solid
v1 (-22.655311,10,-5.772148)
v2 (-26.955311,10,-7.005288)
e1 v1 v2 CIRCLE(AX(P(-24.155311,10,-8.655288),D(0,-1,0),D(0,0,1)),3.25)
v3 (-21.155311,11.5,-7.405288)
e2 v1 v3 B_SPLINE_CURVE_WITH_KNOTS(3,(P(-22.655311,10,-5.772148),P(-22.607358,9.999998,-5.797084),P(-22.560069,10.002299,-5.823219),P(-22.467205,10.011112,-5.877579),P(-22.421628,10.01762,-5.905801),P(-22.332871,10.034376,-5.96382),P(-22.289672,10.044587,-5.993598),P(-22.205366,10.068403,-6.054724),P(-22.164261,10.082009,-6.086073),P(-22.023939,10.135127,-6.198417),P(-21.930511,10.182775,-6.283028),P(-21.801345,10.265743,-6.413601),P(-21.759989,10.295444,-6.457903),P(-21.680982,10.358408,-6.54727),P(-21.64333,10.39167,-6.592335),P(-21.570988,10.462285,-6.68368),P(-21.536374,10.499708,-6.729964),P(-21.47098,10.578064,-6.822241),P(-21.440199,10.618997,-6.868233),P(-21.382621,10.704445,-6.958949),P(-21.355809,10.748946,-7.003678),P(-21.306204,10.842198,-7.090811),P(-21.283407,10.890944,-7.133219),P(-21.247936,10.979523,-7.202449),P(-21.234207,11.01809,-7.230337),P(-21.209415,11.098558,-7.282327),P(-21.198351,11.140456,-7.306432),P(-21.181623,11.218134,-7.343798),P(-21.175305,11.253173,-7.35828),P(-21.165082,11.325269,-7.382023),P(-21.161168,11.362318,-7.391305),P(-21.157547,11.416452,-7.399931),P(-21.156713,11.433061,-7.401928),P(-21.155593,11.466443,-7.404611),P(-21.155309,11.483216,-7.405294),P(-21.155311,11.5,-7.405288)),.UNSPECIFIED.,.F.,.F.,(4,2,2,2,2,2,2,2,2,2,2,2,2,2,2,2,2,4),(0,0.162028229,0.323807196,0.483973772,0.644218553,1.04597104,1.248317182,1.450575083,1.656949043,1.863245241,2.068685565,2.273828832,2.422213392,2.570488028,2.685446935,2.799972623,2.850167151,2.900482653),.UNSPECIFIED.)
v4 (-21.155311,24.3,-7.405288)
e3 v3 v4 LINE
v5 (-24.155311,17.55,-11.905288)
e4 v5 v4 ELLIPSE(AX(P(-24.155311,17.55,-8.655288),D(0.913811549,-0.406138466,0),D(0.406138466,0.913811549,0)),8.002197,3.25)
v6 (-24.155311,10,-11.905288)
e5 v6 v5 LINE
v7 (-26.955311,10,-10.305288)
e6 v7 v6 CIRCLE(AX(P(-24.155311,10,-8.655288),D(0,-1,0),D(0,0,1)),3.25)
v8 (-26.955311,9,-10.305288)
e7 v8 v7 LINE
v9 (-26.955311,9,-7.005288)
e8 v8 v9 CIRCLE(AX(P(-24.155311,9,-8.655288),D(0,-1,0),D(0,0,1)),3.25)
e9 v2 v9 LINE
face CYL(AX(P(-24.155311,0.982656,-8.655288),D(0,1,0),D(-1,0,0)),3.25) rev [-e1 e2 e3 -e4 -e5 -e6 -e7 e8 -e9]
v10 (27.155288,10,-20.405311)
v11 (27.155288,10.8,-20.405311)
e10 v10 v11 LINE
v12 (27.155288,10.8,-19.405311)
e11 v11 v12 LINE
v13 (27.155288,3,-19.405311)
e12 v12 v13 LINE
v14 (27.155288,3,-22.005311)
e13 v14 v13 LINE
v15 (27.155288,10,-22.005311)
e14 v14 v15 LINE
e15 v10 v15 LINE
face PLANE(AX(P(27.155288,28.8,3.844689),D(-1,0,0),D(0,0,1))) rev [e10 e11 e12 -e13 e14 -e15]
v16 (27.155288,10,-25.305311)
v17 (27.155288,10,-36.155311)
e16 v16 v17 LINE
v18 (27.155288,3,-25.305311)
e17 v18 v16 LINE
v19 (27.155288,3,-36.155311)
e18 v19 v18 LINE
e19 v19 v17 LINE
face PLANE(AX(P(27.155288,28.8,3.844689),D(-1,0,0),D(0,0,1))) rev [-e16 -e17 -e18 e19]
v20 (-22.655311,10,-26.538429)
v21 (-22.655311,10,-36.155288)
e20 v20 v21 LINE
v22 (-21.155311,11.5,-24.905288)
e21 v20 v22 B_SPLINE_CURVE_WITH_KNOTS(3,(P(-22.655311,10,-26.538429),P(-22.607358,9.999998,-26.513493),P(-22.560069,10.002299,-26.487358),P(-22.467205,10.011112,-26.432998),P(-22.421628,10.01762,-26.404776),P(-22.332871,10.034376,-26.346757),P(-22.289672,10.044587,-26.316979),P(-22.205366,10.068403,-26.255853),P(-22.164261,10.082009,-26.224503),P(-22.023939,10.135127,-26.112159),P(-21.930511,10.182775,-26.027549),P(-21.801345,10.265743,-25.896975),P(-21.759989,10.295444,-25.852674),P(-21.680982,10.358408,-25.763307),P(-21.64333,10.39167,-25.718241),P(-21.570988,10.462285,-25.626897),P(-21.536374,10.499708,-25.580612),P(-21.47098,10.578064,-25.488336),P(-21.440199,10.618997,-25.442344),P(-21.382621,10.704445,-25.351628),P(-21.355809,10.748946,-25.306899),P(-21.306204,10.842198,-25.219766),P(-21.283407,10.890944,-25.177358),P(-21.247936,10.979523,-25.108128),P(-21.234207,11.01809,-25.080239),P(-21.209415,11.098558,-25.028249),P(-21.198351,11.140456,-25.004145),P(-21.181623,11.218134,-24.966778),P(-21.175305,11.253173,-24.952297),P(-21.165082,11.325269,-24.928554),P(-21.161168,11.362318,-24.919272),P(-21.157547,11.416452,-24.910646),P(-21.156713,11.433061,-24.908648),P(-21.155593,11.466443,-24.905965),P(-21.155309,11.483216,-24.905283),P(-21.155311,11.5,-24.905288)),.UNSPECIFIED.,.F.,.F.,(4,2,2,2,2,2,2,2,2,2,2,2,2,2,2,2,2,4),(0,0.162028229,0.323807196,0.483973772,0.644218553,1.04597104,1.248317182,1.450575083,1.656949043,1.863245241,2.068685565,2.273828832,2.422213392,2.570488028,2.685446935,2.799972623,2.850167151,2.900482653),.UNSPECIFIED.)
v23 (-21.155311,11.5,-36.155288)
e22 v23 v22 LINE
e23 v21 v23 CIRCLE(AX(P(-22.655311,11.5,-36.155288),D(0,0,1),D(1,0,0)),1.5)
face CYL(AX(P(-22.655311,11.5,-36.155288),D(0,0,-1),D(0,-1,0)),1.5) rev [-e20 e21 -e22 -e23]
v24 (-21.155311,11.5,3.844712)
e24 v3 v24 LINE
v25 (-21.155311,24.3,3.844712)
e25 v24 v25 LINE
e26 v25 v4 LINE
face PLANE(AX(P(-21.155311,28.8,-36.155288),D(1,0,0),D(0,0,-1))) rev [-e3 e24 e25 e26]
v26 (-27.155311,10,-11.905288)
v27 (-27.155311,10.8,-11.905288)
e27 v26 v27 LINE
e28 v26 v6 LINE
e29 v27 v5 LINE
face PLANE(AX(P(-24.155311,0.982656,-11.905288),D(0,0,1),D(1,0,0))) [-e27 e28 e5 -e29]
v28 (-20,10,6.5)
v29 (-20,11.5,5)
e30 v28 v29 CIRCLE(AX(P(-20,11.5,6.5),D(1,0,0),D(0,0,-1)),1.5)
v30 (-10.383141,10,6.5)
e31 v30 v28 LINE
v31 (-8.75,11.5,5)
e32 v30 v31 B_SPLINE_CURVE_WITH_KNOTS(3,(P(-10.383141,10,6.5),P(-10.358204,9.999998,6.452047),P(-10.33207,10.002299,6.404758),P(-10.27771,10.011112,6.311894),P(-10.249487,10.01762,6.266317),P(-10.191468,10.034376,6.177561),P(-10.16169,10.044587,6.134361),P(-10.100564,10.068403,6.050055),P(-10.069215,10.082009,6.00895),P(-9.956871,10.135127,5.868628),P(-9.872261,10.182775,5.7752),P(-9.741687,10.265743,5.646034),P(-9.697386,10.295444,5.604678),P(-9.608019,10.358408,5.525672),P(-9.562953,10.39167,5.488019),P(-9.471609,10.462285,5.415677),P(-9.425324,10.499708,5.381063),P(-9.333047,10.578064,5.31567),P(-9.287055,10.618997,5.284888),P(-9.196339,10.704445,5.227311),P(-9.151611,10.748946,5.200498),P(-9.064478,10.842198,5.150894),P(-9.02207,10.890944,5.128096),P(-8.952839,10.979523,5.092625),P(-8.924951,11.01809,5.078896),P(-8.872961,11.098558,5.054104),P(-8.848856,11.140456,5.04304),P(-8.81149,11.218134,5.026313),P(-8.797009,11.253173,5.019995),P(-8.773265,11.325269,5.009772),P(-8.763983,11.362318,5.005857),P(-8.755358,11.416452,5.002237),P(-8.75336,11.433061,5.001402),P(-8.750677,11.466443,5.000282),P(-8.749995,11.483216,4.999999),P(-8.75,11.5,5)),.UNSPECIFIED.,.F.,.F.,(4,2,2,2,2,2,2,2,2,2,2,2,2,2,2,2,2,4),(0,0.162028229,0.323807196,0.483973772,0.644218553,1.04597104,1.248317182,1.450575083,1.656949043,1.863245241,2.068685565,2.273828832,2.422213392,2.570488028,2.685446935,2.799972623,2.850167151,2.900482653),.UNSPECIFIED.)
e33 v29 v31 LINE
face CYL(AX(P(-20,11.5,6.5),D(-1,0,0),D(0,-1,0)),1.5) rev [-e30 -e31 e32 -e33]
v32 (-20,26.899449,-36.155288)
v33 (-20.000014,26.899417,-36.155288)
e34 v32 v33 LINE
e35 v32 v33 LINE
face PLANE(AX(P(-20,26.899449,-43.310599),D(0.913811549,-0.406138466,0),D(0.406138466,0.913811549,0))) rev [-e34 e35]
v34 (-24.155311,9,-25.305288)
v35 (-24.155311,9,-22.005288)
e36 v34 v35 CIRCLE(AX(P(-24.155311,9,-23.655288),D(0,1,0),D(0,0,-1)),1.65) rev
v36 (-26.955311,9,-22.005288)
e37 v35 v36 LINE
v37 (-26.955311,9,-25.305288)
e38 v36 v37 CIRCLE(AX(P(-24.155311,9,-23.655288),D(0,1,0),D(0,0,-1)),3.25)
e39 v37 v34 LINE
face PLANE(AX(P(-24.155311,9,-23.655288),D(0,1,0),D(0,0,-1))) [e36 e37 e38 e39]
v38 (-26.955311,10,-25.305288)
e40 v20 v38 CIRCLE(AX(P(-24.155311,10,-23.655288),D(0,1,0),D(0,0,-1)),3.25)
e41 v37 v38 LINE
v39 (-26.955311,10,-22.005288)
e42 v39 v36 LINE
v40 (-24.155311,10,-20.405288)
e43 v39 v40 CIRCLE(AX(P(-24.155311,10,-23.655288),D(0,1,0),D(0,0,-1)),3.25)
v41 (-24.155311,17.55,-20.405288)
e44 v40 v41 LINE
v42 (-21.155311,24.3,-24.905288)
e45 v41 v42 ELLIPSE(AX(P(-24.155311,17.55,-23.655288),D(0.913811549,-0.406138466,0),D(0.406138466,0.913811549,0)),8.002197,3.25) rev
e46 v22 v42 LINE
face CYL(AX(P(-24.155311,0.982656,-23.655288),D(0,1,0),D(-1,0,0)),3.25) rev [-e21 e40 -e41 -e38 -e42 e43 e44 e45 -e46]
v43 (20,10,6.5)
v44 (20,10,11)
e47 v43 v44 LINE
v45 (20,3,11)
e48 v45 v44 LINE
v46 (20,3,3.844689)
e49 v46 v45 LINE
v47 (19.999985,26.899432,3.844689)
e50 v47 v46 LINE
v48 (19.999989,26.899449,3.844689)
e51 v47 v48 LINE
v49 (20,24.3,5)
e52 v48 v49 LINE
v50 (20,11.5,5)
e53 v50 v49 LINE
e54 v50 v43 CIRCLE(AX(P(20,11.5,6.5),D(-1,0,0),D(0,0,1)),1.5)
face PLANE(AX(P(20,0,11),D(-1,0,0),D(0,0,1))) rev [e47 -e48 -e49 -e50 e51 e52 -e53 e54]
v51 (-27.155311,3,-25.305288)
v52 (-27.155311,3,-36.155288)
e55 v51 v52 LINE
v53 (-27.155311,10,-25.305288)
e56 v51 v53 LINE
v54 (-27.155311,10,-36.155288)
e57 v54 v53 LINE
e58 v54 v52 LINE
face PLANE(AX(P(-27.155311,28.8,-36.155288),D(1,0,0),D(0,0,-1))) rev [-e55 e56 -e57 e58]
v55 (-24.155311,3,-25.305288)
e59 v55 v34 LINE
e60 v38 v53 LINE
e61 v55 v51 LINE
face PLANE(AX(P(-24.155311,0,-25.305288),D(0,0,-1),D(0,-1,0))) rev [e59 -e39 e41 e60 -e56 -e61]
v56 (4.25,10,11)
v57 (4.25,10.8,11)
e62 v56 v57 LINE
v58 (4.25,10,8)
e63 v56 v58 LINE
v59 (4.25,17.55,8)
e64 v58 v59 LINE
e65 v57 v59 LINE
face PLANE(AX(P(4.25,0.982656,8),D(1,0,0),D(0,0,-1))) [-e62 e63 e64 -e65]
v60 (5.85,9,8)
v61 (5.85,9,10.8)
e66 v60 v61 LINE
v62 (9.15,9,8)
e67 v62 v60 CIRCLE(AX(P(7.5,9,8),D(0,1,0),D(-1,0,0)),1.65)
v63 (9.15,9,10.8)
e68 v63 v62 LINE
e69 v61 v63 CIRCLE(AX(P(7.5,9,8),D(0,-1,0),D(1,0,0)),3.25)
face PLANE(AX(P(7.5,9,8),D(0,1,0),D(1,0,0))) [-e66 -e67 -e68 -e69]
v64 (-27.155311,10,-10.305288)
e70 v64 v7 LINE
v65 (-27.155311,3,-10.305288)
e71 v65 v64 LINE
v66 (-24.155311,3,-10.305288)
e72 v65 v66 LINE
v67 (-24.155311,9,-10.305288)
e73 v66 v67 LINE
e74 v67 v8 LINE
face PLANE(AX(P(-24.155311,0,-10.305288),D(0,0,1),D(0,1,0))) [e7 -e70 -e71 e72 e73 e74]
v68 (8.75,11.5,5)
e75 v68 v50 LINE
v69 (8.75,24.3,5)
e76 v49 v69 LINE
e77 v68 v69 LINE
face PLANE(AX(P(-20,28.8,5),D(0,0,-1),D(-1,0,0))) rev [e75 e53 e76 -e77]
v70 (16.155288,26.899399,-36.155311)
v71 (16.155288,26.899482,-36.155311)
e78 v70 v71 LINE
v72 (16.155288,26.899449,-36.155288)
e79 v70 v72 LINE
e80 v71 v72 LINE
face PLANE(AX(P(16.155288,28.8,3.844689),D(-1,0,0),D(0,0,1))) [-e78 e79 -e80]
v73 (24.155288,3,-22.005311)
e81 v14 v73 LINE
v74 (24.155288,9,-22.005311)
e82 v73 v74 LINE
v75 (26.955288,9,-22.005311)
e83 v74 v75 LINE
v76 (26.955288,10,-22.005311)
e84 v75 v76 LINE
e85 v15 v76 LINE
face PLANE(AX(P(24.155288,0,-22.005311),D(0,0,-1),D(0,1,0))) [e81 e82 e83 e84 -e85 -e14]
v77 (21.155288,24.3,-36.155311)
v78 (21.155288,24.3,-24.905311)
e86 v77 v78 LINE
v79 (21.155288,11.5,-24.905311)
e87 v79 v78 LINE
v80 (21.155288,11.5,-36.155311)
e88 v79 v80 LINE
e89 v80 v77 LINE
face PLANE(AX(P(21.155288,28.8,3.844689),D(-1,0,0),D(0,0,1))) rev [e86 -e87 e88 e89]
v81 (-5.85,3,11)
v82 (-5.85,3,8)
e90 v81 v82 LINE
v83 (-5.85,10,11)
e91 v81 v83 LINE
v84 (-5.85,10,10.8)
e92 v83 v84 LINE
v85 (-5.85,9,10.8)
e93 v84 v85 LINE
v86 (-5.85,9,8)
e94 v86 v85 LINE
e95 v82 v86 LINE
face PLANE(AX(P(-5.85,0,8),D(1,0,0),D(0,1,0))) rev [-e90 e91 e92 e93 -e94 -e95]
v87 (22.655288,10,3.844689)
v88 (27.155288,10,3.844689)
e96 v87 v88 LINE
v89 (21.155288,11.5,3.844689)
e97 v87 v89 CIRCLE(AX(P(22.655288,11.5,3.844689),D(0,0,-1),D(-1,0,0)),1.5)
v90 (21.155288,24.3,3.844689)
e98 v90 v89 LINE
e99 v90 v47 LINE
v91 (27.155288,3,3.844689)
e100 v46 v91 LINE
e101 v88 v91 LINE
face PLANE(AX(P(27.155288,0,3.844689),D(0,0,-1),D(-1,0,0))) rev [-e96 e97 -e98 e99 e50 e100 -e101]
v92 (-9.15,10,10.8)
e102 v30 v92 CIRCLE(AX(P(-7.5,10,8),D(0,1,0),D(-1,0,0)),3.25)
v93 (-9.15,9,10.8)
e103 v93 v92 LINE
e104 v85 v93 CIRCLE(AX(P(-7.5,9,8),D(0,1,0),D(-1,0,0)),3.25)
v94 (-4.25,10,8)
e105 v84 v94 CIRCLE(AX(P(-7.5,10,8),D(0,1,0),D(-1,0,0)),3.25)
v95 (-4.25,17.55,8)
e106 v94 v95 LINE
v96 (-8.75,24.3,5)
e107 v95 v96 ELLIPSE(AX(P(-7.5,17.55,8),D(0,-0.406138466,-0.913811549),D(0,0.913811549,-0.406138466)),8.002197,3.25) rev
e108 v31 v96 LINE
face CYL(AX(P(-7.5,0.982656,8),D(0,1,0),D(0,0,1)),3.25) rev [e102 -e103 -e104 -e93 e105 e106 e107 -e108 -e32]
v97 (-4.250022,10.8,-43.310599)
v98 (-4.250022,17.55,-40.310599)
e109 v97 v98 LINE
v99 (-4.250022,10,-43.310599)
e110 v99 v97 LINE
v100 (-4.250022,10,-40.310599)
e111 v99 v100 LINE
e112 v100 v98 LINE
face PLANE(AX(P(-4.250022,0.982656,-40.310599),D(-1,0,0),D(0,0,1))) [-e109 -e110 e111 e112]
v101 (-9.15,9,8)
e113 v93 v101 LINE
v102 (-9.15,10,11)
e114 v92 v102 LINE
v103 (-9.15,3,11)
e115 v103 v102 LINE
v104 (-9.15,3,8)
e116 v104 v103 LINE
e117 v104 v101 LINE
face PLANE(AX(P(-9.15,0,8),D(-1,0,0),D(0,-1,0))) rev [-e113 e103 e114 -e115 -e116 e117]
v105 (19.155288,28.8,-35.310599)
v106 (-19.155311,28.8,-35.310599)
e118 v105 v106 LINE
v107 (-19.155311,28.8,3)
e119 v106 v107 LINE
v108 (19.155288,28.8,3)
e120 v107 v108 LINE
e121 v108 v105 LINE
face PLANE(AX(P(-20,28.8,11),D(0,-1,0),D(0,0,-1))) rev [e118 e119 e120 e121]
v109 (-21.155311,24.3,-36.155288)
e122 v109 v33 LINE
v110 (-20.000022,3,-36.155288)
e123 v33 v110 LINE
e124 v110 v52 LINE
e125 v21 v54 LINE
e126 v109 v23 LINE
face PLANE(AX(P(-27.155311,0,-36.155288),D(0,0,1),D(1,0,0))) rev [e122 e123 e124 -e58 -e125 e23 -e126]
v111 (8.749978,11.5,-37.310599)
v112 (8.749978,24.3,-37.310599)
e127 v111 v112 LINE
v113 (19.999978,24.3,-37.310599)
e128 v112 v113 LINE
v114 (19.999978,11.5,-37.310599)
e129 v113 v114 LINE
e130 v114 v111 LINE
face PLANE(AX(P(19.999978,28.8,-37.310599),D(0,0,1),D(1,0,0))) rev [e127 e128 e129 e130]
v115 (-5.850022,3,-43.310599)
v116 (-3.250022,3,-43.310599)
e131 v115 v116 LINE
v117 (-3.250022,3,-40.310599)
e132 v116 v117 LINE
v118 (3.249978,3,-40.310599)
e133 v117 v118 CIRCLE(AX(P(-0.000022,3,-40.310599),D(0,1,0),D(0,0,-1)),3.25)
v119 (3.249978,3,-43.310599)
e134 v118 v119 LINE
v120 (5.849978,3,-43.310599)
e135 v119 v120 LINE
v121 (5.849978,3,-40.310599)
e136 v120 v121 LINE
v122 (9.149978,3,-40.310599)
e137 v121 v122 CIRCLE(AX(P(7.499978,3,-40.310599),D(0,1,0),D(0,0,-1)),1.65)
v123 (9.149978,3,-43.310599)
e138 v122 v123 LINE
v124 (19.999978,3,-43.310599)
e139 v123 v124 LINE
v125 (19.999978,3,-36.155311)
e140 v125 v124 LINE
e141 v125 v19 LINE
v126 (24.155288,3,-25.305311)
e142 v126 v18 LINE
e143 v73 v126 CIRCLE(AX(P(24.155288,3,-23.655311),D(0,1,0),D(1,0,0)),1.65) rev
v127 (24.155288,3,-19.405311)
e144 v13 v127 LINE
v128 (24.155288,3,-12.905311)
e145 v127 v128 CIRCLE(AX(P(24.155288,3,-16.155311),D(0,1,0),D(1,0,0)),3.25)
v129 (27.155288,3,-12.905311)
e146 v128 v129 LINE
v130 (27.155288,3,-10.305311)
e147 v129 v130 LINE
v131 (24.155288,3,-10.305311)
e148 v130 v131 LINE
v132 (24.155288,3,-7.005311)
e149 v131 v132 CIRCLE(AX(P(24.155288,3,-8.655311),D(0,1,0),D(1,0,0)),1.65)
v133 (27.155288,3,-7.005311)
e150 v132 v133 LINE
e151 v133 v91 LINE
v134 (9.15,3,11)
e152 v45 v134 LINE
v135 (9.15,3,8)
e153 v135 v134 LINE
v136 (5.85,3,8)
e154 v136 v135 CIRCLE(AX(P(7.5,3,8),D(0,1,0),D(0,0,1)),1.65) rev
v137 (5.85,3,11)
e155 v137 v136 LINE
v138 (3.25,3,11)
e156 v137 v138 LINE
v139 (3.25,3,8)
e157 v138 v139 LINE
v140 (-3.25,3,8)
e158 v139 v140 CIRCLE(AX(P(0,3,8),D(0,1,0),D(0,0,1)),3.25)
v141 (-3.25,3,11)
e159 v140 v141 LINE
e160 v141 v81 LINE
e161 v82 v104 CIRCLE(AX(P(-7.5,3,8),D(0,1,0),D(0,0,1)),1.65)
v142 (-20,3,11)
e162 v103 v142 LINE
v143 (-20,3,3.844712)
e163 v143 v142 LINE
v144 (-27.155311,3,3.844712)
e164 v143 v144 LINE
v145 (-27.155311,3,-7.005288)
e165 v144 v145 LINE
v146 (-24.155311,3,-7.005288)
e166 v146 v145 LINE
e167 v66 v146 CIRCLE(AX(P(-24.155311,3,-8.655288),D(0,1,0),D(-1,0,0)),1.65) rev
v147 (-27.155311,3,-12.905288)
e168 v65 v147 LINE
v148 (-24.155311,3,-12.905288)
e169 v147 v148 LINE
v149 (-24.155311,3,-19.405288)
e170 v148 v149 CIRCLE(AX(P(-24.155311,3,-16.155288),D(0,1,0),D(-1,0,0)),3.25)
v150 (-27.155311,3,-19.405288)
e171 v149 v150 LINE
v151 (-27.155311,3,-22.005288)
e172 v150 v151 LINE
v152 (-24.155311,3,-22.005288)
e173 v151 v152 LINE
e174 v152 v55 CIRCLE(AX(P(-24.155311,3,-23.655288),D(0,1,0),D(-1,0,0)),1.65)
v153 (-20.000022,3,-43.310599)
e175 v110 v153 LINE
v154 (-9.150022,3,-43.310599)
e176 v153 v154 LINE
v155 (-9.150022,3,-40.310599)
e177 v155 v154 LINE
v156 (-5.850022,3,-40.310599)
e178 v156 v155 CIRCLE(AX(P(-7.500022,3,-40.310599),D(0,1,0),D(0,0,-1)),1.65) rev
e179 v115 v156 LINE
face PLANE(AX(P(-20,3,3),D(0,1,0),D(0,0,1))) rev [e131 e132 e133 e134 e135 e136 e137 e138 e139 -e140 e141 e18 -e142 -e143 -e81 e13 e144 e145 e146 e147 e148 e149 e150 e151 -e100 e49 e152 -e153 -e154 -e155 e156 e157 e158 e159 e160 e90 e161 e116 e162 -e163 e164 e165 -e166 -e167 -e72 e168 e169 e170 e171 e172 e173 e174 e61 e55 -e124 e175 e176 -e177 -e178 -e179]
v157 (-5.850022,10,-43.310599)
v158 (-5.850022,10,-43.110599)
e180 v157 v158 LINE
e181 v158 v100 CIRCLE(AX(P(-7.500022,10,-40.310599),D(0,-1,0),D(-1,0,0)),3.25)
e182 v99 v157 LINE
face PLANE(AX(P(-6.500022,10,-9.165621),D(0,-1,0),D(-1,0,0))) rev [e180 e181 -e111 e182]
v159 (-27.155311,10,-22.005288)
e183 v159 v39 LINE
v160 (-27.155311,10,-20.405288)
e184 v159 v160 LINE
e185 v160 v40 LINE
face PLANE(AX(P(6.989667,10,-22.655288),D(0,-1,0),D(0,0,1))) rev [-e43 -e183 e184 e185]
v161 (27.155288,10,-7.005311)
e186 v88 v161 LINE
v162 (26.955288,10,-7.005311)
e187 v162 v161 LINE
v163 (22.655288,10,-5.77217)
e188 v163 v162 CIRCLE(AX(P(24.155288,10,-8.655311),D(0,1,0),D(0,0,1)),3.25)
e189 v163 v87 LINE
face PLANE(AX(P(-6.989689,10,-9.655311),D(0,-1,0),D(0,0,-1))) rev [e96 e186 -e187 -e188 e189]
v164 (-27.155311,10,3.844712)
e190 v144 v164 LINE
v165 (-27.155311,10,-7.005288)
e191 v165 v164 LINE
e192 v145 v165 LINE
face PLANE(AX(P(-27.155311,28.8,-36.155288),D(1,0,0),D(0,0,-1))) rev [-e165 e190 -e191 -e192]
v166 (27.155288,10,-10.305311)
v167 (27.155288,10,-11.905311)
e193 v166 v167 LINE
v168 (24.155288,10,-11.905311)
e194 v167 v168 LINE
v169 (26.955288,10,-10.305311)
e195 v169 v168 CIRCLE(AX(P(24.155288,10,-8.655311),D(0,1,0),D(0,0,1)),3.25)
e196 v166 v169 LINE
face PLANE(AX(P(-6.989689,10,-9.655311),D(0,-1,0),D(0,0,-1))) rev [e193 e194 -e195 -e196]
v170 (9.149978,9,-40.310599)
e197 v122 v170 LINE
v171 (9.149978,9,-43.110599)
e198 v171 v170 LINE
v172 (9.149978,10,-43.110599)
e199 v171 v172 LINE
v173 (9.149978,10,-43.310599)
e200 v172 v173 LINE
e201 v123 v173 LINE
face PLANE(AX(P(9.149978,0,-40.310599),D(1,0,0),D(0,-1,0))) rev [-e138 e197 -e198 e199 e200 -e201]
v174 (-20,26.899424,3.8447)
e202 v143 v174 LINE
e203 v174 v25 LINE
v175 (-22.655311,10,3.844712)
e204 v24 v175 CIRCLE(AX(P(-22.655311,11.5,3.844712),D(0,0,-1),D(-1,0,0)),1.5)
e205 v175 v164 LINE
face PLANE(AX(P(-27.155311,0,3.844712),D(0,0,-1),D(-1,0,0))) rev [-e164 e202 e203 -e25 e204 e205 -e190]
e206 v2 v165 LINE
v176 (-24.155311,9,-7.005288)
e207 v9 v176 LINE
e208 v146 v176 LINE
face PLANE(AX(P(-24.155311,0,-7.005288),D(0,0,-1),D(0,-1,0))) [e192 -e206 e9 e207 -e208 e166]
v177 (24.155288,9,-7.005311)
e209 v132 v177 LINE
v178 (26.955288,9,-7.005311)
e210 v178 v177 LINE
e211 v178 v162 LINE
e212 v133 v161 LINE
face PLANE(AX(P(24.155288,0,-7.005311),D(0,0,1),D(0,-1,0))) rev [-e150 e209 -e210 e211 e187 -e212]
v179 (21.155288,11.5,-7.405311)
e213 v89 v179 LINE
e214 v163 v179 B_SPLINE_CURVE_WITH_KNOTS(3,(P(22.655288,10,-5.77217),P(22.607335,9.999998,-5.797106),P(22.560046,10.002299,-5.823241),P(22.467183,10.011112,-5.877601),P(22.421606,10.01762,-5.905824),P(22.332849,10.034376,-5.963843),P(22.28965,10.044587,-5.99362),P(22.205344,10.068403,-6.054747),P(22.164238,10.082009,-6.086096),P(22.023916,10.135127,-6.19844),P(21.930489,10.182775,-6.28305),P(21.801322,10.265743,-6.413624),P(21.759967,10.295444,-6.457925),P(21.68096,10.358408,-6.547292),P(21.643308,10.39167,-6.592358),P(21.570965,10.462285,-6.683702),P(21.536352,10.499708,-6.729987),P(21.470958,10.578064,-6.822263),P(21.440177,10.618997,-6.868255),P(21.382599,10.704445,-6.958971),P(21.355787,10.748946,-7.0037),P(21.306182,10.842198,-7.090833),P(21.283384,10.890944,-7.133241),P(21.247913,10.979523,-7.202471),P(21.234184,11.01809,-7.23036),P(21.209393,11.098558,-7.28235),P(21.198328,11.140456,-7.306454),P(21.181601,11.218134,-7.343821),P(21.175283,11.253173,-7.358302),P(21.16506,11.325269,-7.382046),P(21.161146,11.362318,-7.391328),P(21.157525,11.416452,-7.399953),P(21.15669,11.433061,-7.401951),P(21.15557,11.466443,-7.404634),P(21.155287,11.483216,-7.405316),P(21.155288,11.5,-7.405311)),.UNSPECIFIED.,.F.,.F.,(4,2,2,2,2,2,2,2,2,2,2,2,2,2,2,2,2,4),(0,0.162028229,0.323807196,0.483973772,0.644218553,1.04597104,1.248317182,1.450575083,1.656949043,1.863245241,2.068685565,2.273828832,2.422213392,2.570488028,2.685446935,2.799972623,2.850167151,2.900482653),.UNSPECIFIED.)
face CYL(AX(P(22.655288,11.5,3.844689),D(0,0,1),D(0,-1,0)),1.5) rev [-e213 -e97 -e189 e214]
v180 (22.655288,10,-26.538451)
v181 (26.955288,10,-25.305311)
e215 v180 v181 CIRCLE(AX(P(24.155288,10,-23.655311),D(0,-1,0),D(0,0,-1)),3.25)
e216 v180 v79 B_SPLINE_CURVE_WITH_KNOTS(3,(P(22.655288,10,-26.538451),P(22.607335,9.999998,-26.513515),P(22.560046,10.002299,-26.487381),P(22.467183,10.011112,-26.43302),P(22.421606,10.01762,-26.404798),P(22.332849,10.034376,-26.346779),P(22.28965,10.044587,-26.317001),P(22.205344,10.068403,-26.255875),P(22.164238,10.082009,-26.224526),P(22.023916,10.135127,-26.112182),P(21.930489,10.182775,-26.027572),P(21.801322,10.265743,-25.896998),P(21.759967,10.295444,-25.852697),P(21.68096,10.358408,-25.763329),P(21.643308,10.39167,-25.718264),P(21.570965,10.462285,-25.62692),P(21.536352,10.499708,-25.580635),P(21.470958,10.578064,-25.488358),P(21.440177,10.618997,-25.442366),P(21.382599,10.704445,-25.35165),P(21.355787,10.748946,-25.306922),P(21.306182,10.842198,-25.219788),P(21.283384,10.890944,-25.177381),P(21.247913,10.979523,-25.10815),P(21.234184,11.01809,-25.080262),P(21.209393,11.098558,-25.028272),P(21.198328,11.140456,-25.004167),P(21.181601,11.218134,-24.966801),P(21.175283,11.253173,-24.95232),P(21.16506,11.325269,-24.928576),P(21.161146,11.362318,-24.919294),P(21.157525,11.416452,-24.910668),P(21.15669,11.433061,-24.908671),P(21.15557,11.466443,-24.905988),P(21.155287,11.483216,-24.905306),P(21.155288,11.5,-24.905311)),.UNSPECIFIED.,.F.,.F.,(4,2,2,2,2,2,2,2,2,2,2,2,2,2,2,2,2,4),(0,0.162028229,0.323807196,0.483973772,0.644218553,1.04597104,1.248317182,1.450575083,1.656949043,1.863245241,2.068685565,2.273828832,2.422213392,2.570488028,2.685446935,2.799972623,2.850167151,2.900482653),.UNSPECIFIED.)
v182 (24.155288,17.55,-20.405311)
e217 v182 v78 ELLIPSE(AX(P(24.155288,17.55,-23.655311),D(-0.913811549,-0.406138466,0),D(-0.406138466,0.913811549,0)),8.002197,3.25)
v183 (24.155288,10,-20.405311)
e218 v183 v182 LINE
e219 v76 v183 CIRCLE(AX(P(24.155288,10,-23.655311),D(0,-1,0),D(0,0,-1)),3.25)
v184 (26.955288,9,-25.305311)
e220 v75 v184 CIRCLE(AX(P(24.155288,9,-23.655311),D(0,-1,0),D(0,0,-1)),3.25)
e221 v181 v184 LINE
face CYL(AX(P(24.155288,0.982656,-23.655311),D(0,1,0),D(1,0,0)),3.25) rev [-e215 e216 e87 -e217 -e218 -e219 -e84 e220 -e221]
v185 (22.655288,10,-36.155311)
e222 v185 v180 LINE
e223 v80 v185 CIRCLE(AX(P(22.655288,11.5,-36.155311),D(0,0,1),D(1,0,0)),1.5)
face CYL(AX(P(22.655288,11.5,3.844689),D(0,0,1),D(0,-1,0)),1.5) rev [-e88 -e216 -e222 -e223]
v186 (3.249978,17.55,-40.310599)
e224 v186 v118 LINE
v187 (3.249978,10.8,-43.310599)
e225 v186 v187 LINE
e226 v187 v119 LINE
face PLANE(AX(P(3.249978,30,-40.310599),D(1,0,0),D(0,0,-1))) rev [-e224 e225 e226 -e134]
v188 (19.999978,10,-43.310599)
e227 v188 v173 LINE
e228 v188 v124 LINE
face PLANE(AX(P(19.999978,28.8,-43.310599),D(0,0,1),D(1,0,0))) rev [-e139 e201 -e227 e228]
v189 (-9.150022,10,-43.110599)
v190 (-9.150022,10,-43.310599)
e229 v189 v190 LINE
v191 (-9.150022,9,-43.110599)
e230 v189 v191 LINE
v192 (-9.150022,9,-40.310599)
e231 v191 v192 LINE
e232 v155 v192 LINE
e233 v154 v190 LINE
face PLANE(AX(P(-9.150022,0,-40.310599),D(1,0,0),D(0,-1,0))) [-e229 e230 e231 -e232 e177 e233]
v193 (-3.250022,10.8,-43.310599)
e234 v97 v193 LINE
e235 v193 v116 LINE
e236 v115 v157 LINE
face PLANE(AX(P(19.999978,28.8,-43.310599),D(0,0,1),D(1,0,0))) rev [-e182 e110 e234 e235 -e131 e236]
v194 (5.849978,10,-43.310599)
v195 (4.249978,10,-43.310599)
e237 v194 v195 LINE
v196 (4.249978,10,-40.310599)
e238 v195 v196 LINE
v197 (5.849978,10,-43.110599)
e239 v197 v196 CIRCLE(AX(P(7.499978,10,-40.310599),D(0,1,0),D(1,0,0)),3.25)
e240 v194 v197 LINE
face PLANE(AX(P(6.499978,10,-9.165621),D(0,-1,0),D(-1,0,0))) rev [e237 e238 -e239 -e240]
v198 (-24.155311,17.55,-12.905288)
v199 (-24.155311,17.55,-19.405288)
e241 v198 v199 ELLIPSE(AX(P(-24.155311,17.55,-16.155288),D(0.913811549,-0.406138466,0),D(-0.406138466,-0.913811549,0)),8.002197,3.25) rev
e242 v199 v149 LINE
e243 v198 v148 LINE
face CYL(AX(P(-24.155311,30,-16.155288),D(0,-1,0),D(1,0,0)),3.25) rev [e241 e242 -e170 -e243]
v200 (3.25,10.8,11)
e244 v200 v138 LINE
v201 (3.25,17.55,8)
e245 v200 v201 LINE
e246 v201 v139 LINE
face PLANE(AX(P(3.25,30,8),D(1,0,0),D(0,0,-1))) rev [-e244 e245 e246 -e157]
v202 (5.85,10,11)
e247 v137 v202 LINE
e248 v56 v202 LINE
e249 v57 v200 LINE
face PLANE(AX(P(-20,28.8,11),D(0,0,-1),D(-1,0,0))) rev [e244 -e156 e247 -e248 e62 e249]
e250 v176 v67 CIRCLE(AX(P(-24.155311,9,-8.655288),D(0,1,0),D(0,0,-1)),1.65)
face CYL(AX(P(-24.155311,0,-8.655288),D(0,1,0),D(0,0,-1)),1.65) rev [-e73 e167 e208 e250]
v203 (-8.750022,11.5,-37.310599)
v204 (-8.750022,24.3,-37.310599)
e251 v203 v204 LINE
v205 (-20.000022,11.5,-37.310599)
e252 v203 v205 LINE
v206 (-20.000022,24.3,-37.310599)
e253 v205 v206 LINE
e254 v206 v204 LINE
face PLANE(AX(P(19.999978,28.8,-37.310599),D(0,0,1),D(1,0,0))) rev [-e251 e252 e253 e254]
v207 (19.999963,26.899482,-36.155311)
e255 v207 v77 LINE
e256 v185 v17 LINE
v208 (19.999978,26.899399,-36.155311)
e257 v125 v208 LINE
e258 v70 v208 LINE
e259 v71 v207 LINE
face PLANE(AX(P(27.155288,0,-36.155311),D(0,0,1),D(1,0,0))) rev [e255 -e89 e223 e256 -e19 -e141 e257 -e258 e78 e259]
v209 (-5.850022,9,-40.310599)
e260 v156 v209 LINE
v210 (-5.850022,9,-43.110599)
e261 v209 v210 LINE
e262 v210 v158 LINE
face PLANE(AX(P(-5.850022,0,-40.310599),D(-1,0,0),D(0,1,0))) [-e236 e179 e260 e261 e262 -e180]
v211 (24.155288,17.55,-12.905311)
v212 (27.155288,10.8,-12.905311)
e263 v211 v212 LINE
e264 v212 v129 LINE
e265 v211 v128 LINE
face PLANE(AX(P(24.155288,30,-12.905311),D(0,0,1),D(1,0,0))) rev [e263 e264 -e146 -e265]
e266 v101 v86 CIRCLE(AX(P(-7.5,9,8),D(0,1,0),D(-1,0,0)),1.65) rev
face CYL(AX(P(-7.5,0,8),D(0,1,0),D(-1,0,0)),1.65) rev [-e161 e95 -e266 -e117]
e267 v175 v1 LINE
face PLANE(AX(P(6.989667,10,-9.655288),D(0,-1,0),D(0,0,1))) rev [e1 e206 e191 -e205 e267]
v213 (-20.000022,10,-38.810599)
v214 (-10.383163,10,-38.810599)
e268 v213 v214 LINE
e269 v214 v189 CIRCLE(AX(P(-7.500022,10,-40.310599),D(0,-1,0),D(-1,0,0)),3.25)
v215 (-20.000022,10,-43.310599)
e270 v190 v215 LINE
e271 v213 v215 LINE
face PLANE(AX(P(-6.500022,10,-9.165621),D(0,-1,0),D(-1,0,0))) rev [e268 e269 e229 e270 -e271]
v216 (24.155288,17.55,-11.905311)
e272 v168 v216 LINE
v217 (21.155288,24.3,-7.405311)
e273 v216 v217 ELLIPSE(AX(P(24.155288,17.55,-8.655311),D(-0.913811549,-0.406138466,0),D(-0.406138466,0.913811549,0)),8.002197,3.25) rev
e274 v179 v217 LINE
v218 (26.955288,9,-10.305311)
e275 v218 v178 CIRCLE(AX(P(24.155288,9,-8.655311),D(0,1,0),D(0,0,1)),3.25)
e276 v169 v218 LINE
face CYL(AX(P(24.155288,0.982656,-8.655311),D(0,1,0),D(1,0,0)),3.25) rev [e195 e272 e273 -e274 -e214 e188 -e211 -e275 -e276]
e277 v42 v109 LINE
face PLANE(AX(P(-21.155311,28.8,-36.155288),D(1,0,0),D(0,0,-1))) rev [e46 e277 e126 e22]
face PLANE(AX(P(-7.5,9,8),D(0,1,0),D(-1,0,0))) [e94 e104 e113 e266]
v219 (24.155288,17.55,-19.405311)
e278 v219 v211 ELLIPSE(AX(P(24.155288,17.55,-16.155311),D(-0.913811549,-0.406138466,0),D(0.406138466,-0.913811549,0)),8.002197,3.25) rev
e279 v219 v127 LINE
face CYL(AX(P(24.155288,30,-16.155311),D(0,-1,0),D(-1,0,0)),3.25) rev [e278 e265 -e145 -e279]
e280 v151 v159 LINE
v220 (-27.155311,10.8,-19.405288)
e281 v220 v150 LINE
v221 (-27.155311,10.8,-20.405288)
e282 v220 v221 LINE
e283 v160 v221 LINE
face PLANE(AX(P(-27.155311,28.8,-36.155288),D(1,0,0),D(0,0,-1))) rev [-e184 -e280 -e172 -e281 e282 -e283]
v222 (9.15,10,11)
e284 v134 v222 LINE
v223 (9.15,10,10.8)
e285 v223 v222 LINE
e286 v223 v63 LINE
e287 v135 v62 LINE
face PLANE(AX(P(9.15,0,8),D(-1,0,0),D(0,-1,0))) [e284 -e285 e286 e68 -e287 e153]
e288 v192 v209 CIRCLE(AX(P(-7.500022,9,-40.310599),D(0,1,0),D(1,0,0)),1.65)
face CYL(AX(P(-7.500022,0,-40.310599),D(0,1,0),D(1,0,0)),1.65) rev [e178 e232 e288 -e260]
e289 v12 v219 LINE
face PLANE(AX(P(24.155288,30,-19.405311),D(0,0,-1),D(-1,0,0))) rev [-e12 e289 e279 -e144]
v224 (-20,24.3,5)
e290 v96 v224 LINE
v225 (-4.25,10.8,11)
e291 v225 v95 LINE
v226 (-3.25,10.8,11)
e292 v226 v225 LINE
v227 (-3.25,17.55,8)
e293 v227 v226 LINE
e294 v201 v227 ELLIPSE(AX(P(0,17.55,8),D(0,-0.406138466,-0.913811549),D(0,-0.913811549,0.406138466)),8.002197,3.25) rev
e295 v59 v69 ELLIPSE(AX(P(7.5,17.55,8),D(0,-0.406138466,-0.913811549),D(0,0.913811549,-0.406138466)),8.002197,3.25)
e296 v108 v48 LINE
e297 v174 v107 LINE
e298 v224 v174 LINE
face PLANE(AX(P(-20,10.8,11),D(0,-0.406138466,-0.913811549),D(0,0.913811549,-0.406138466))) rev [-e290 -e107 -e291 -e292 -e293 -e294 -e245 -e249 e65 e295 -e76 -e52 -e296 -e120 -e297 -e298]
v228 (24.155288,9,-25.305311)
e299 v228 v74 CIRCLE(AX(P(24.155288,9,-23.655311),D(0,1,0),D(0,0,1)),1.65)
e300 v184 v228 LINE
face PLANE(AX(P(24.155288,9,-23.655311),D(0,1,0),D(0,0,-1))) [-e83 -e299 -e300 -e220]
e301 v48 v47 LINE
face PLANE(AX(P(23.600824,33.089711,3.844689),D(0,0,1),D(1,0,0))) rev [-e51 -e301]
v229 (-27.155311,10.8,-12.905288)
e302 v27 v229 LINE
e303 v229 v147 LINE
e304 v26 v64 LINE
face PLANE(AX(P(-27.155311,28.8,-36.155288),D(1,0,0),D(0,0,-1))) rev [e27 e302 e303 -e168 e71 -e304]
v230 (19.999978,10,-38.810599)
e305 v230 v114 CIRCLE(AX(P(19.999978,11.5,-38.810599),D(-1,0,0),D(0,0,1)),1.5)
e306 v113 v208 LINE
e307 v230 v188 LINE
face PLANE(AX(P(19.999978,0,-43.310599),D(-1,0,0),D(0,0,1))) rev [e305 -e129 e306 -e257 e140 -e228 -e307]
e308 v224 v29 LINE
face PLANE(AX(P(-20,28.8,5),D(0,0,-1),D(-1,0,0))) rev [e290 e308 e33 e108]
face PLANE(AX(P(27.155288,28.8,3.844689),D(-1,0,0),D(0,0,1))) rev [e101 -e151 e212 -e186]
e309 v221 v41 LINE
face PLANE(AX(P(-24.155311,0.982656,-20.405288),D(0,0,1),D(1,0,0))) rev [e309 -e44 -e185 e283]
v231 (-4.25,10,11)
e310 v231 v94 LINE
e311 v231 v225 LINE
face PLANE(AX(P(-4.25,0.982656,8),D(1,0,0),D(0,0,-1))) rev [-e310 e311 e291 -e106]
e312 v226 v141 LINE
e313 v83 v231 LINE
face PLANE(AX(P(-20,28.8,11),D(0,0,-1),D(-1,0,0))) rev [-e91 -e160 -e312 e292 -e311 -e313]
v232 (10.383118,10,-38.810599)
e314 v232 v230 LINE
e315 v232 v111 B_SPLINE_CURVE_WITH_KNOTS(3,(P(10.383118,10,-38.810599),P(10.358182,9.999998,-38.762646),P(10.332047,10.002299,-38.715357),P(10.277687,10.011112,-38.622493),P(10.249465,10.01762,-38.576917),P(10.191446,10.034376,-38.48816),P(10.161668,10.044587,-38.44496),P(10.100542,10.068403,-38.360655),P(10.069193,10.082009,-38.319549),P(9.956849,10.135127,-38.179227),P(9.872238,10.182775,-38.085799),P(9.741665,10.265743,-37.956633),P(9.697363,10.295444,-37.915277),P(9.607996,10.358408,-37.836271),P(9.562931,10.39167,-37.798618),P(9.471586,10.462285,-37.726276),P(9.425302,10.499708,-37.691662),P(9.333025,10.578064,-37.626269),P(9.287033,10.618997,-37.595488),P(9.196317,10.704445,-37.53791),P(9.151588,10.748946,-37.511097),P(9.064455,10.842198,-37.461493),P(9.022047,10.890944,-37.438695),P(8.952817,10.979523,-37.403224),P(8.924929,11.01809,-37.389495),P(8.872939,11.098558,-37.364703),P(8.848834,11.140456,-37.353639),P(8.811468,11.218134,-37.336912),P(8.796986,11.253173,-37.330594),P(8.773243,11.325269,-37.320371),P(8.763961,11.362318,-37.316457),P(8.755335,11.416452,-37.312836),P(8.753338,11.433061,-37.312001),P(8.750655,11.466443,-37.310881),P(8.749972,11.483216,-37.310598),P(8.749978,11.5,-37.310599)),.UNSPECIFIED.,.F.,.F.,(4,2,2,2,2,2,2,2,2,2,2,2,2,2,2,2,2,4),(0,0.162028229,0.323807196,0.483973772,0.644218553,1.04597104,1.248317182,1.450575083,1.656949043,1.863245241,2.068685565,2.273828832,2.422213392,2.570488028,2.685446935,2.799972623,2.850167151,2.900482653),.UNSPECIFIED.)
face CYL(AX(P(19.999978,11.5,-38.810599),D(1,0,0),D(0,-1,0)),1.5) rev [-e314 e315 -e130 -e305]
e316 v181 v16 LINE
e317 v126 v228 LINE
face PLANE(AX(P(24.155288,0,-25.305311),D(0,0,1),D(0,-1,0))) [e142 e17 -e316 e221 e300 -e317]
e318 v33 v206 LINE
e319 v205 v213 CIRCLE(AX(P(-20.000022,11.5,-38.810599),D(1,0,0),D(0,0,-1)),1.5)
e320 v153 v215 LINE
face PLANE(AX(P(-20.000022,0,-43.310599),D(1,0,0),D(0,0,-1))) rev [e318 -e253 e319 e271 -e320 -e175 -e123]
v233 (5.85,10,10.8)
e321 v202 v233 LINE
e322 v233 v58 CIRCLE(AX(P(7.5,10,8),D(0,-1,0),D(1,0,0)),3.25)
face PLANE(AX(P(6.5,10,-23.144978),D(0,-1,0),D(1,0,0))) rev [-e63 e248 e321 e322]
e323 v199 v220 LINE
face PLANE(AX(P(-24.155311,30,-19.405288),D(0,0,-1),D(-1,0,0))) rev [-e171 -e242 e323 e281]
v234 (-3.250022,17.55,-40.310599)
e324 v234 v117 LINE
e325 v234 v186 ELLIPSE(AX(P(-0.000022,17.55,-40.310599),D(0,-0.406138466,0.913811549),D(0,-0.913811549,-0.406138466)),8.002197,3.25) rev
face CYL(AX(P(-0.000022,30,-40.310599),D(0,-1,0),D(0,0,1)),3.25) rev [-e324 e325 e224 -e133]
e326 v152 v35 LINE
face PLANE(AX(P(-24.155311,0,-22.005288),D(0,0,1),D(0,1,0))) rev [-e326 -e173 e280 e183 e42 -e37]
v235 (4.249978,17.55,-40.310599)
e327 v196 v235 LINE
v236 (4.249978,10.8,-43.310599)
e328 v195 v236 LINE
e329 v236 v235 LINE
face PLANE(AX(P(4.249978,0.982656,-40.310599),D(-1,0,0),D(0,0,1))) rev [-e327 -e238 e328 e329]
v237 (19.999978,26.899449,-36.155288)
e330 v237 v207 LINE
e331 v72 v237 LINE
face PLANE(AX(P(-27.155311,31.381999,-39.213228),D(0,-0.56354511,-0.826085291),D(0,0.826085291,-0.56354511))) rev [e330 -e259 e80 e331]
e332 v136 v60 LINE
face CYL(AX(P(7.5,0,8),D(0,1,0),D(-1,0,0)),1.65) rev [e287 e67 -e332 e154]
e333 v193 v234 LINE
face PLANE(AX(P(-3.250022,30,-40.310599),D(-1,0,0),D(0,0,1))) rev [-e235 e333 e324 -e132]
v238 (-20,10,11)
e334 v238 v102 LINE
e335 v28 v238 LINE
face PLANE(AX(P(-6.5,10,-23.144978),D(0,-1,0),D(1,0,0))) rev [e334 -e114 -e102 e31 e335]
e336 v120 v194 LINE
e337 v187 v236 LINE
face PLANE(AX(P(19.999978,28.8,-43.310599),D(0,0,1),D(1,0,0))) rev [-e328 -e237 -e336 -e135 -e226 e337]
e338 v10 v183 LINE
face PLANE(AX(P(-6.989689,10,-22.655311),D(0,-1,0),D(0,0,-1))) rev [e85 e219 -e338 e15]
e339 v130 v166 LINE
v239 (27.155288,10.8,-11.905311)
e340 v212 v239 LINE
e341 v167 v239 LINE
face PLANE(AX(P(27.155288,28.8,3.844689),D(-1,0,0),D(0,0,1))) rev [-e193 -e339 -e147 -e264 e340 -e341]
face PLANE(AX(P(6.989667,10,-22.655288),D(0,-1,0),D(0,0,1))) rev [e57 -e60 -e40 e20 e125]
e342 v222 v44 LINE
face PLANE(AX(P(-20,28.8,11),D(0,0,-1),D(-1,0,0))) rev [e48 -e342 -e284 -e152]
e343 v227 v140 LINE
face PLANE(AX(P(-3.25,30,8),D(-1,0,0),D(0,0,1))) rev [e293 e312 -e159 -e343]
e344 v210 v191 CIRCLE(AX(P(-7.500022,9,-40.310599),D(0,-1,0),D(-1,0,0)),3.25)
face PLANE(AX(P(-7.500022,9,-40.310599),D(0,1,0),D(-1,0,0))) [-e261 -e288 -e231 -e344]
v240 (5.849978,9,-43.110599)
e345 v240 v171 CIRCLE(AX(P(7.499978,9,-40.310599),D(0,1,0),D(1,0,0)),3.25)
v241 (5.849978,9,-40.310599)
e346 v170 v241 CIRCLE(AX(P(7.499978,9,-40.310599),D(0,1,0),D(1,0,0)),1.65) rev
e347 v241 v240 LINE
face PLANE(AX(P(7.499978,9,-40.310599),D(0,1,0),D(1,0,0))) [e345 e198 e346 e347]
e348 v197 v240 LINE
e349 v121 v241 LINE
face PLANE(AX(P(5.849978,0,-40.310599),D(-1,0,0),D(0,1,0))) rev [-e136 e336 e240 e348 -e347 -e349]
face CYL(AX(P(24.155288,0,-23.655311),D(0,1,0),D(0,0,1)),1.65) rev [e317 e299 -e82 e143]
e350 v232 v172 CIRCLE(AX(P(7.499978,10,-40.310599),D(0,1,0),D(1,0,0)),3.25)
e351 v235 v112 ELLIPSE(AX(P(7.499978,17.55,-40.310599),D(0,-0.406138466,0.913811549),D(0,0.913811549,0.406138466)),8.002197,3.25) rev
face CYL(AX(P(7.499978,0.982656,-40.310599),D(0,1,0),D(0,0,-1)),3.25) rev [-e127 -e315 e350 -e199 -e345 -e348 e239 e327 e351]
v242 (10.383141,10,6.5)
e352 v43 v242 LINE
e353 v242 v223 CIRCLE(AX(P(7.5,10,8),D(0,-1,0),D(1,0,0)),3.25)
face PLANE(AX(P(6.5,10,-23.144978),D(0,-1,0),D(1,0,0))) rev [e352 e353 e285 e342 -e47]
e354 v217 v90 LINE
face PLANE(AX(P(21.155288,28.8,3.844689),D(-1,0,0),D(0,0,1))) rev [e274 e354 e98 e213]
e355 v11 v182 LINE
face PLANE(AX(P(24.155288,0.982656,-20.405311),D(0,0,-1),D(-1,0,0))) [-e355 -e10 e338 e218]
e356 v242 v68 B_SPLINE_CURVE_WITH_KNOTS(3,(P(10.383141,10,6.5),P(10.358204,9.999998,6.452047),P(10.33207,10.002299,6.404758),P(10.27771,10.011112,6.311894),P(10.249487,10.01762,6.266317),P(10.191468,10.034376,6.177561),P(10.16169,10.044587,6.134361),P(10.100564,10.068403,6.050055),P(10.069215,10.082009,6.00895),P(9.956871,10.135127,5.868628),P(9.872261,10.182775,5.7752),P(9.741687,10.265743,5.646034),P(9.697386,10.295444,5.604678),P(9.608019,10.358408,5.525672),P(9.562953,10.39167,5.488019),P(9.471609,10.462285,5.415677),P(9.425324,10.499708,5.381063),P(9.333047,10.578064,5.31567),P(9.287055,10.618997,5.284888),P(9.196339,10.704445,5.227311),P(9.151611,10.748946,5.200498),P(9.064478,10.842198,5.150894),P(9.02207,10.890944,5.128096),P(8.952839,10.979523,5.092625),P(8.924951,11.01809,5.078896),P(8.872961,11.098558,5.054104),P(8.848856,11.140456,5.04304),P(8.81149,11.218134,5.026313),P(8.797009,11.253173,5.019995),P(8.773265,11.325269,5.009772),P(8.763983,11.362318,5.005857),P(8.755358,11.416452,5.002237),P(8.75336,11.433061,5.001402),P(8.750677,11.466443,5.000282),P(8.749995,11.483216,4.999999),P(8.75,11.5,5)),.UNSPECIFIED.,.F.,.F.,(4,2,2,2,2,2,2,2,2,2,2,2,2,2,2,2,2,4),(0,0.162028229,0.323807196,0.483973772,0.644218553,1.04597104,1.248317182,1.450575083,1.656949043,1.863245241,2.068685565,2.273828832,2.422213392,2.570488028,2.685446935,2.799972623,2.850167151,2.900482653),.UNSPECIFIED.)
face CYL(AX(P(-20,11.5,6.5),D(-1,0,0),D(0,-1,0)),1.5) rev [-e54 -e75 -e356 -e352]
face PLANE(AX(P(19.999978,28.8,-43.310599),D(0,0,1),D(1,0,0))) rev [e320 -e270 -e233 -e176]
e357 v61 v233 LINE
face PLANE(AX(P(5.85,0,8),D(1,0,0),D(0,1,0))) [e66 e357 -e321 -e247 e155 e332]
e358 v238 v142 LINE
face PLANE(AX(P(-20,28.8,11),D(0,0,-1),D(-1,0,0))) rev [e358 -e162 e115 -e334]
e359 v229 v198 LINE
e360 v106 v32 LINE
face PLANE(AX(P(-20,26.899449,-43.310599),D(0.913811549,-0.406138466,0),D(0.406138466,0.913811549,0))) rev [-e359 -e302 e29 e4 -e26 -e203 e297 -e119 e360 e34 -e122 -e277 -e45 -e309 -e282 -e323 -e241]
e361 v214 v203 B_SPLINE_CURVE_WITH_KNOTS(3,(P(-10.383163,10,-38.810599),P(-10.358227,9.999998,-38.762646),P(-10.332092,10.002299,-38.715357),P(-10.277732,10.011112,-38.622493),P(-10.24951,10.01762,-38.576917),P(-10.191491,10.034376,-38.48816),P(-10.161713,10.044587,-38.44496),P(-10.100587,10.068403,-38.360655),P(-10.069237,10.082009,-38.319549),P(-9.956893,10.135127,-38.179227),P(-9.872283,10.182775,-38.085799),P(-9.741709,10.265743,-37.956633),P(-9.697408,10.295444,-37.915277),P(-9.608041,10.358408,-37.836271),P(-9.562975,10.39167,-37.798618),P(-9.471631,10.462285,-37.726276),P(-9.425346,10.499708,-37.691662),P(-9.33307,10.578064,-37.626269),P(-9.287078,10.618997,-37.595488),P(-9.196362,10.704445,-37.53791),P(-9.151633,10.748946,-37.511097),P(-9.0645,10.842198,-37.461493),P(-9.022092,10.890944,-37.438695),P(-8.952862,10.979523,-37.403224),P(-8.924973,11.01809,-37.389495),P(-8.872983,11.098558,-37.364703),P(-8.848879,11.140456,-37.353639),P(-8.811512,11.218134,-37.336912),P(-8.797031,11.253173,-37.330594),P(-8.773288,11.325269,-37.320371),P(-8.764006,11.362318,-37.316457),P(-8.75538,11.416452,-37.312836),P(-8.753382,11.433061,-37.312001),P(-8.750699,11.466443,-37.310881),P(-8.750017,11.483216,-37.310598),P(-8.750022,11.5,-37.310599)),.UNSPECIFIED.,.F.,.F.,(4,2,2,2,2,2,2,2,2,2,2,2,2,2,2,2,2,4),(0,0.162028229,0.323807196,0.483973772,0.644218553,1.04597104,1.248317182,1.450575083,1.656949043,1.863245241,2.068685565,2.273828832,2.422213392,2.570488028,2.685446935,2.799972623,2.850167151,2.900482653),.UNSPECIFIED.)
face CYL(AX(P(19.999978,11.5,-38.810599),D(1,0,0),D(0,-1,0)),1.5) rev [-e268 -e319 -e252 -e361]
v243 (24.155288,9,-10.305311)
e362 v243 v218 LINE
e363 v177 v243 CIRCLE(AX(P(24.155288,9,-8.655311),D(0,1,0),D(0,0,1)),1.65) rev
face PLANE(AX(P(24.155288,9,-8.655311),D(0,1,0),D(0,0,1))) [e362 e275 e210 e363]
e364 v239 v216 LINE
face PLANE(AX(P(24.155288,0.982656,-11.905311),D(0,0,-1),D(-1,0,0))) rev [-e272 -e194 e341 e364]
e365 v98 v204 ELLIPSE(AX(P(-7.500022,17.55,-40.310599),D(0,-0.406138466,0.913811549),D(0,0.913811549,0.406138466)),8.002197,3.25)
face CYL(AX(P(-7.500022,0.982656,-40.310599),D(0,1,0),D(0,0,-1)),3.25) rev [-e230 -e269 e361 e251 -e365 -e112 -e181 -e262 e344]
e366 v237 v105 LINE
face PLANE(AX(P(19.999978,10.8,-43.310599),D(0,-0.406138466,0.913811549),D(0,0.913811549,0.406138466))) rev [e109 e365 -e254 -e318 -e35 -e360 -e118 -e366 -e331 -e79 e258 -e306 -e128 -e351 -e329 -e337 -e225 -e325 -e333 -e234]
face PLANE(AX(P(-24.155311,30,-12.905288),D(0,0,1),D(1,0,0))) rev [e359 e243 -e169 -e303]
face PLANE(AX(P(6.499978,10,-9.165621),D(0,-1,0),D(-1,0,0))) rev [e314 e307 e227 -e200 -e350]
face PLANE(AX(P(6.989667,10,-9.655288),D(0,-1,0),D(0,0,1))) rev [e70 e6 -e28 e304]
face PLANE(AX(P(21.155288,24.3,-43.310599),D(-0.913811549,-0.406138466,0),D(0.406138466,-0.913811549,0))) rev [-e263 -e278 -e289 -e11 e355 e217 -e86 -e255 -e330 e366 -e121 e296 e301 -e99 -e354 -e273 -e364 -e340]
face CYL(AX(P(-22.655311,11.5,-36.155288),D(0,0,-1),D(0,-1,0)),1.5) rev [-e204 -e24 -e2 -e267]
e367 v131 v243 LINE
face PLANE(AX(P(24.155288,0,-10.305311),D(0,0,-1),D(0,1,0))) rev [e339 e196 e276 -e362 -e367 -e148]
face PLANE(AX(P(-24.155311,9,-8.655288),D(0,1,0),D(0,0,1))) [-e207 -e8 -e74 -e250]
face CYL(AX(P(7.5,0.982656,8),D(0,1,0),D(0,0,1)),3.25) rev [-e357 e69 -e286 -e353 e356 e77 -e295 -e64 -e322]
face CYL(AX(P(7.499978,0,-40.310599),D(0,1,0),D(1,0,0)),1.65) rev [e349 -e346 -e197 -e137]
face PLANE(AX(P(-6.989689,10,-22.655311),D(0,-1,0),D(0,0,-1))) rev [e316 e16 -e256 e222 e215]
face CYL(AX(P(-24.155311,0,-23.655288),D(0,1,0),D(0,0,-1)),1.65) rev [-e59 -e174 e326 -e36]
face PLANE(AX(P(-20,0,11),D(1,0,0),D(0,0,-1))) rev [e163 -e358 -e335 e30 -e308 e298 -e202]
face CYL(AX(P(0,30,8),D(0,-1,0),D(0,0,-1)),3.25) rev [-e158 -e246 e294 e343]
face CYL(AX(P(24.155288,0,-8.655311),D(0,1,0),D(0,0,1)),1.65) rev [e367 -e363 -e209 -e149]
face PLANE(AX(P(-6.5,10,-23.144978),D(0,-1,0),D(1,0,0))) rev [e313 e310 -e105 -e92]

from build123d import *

# Parameters (mm, degrees)
SKETCH1_W            = 40
SKETCH1_H            = 28.8
BOSS_EXTRUDE1_DEPTH  = 11
CHAMFER2_SIZE        = 8
CHAMFER2_SIZE2       = 18
SKETCH10_W           = 13.5
SKETCH10_H           = 18.8
CUT_EXTRUDE7_DEPTH   = 6
FILLET1_R            = 1.5
SKETCH11_W           = 40
SKETCH11_H           = 3
CUT_EXTRUDE8_DEPTH   = 8
CUT_EXTRUDE9_REACH   = 38.748
CUT_EXTRUDE10_DEPTH  = 30.57093174
CUT_EXTRUDE2_DEPTH   = 30
SKETCH15_R           = 3.25
CUT_EXTRUDE12_DEPTH  = 1
CRVPATTERN15_ANGLE   = 90
CRVPATTERN15_2_ANGLE = 90
CRVPATTERN15_3_ANGLE = 180
CUT_EXTRUDE17_DEPTH  = 71.205905928
CUT_EXTRUDE18_DEPTH  = 62.566827448
CUT_EXTRUDE19_DEPTH  = 62.566810271
CUT_EXTRUDE20_DEPTH  = 71.20590591
SKETCH32_W           = 149.475413632
SKETCH32_H           = 198.109954942
CUT_EXTRUDE21_DEPTH  = 3
SKETCH34_W           = 32.310599212
SKETCH34_H           = 32.310599212
BOSS_EXTRUDE4_DEPTH  = 25.8


with BuildPart() as part:
    # Sketch1 → Boss-Extrude1 (new body)
    with BuildSketch(Plane.XY):
        with Locations((0, 14.4)):
            Rectangle(SKETCH1_W, SKETCH1_H)
    extrude(amount=BOSS_EXTRUDE1_DEPTH)

    # Chamfer2
    chamfer2_edges = [part.edges().sort_by_distance(p)[0] for p in [
        (0, 28.8, 11),
    ]]
    chamfer2_side = [part.faces().sort_by_distance(p)[0] for p in [
        (0, 28.8, 5.5),
    ]]
    chamfer(chamfer2_edges, length=CHAMFER2_SIZE, length2=CHAMFER2_SIZE2, reference=chamfer2_side[0])

    # Sketch10 → Cut-Extrude7 (cut)
    with BuildSketch(Plane.XY.offset(11)):
        with Locations((-13.25, 19.4)):
            Rectangle(SKETCH10_W, SKETCH10_H)
        with Locations((13.25, 19.4)):
            Rectangle(SKETCH10_W, SKETCH10_H)
    extrude(amount=-CUT_EXTRUDE7_DEPTH, mode=Mode.SUBTRACT)

    # Fillet1
    fillet1_edges = [part.edges().sort_by_distance(p)[0] for p in [
        (-13.25, 10, 5),
        (13.25, 10, 5),
    ]]
    fillet(fillet1_edges, radius=FILLET1_R)

    # Sketch11 → Cut-Extrude8 (cut)
    with BuildSketch(Plane.XY.offset(11)):
        with Locations((0, 1.5)):
            Rectangle(SKETCH11_W, SKETCH11_H)
    extrude(amount=-CUT_EXTRUDE8_DEPTH, mode=Mode.SUBTRACT)

    # Cut-Extrude9: up to this face of the body (flat: up to its plane)
    cut_extrude9_end = Plane(part.part.faces().sort_by_distance((-13.25, 10, 8.75))[0])
    # Sketch12 → Cut-Extrude9 (cut, up to the picked face)
    with BuildSketch(Plane(origin=(0, 28.8, 0), x_dir=(1, 0, 0), z_dir=(0, 1, 0)), mode=Mode.PRIVATE) as cut_extrude9_sk1:
        with BuildLine():
            Line((-4.25, -8), (-4.25, -11))
            Line((-4.25, -11), (-10.75, -11))
            Line((-10.75, -11), (-10.75, -8))
            ThreePointArc((-10.75, -8), (-7.5, -4.75), (-4.25, -8))
        make_face()
    cut_extrude9_tool1 = split(extrude(cut_extrude9_sk1.sketch, amount=-CUT_EXTRUDE9_REACH, mode=Mode.PRIVATE), bisect_by=cut_extrude9_end, keep=Keep.BOTH, mode=Mode.PRIVATE)
    cut_extrude9 = cut_extrude9_tool1.solids().sort_by(Axis((-7.5, 28.8, 8.176346), (0, -1, 0)))[0]
    add(cut_extrude9, mode=Mode.SUBTRACT)

    # Sketch13 → Cut-Extrude10 (cut, through all)
    with BuildSketch(Plane(origin=(0, 10, 0), x_dir=(1, 0, 0), z_dir=(0, 1, 0))):
        with BuildLine():
            Line((-9.15, -8), (-9.15, -11))
            Line((-9.15, -11), (-5.85, -11))
            Line((-5.85, -11), (-5.85, -8))
            ThreePointArc((-5.85, -8), (-7.5, -6.35), (-9.15, -8))
        make_face()
    cut_extrude10 = extrude(amount=-CUT_EXTRUDE10_DEPTH, mode=Mode.SUBTRACT)

    # Sketch3 → Cut-Extrude2 (cut)
    with BuildSketch(Plane.XZ):
        with BuildLine():
            Line((-3.25, 8), (-3.25, 11))
            Line((-3.25, 11), (3.25, 11))
            Line((3.25, 11), (3.25, 8))
            ThreePointArc((3.25, 8), (0, 4.75), (-3.25, 8))
        make_face()
    extrude(amount=-CUT_EXTRUDE2_DEPTH, mode=Mode.SUBTRACT)

    # Sketch15 → Cut-Extrude12 (cut)
    with BuildSketch(Plane(origin=(0, 10, 0), x_dir=(1, 0, 0), z_dir=(0, 1, 0))):
        with Locations((-7.5, -8)):
            Circle(SKETCH15_R)
    cut_extrude12 = extrude(amount=-CUT_EXTRUDE12_DEPTH, mode=Mode.SUBTRACT)

    # Mirror1: Cut-Extrude9, Cut-Extrude10, Cut-Extrude12 across plane
    add(cut_extrude9.mirror(Plane(origin=(0, 0, 0), x_dir=(0, 0, 1), z_dir=(1, 0, 0))), mode=Mode.SUBTRACT)
    add(cut_extrude10.mirror(Plane(origin=(0, 0, 0), x_dir=(0, 0, 1), z_dir=(1, 0, 0))), mode=Mode.SUBTRACT)
    add(cut_extrude12.mirror(Plane(origin=(0, 0, 0), x_dir=(0, 0, 1), z_dir=(1, 0, 0))), mode=Mode.SUBTRACT)


with BuildPart() as body_2:
    # CrvPattern15: read off the stored shape, not the designer's step
    # CrvPattern15: copy of part
    add(part.part.moved(Location((-16.1552884, 0, 16.1553108))).rotate(Axis((0, 0, 0), (0, -1, 0)), CRVPATTERN15_ANGLE))


with BuildPart() as body_3:
    # CrvPattern15 2: copy of part
    add(part.part.moved(Location((16.1553108, 0, 16.1552884))).rotate(Axis((0, 0, 0), (0, 1, 0)), CRVPATTERN15_2_ANGLE))


with BuildPart() as body_4:
    # CrvPattern15 3: copy of part
    add(part.part.moved(Location((2.24e-05, 0, 32.3105992))).rotate(Axis((0, 0, 0), (0, 1, 0)), CRVPATTERN15_3_ANGLE))


with BuildPart() as cut_extrude17_tool:
    # Sketch28 → Cut-Extrude17 (new, through all)
    with BuildSketch(Plane.ZY.offset(20)):
        Polygon((3, 28.8), (8.248381553, 50.710117836), (5, 24.3), align=None)
    extrude(amount=-CUT_EXTRUDE17_DEPTH)


with BuildPart() as body_2_1:
    add(body_2.part)

    # Cut-Extrude17: cut by cut_extrude17_tool
    add(cut_extrude17_tool.part, mode=Mode.SUBTRACT)


with BuildPart() as body_3_1:
    add(body_3.part)

    # Cut-Extrude17: cut by cut_extrude17_tool
    add(cut_extrude17_tool.part, mode=Mode.SUBTRACT)


with BuildPart() as cut_extrude18_tool:
    # Sketch29 → Cut-Extrude18 (new, through all)
    with BuildSketch(Plane.XY.offset(3.844711608)):
        Polygon((-20, 26.899449344), (-21.15531082, 24.3), (-24.025546184, 30.410559603), (-17.596499578, 32.307325294), align=None)
    extrude(amount=-CUT_EXTRUDE18_DEPTH)


with BuildPart() as part_1:
    add(part.part)

    # Cut-Extrude18: cut by cut_extrude18_tool
    add(cut_extrude18_tool.part, mode=Mode.SUBTRACT)


with BuildPart() as body_4_1:
    add(body_4.part)

    # Cut-Extrude18: cut by cut_extrude18_tool
    add(cut_extrude18_tool.part, mode=Mode.SUBTRACT)


with BuildPart() as cut_extrude19_tool:
    # Sketch30 → Cut-Extrude19 (new, through all)
    with BuildSketch(Plane.XY.offset(3.84468918)):
        Polygon((21.155288392, 24.3), (19.999977573, 26.899449344), (18.296515049, 30.732240022), (23.600824173, 33.089710744), align=None)
    extrude(amount=-CUT_EXTRUDE19_DEPTH)


with BuildPart() as part_2:
    add(part_1.part)

    # Cut-Extrude19: cut by cut_extrude19_tool
    add(cut_extrude19_tool.part, mode=Mode.SUBTRACT)


with BuildPart() as body_4_2:
    add(body_4_1.part)

    # Cut-Extrude19: cut by cut_extrude19_tool
    add(cut_extrude19_tool.part, mode=Mode.SUBTRACT)


with BuildPart() as cut_extrude20_tool:
    # Sketch31 → Cut-Extrude20 (new, through all)
    with BuildSketch(Plane(origin=(19.999977573, 0, 0), x_dir=(0, 0, -1), z_dir=(1, 0, 0))):
        Polygon((36.155288392, 26.899449344), (31.135560458, 38.193837197), (35.352724539, 40.068132344), (39.213228154, 31.381999209), align=None)
    extrude(amount=-CUT_EXTRUDE20_DEPTH)


with BuildPart() as body_2_2:
    add(body_2_1.part)

    # Cut-Extrude20: cut by cut_extrude20_tool
    add(cut_extrude20_tool.part, mode=Mode.SUBTRACT)


with BuildPart() as body_3_2:
    add(body_3_1.part)

    # Cut-Extrude20: cut by cut_extrude20_tool
    add(cut_extrude20_tool.part, mode=Mode.SUBTRACT)


with BuildPart() as cut_extrude21_tool:
    # Sketch32 → Cut-Extrude21 (new body)
    with BuildSketch(Plane.XZ.offset(-3)):
        with Locations((-20.69221841, -55.919702486)):
            Rectangle(SKETCH32_W, SKETCH32_H)
    extrude(amount=CUT_EXTRUDE21_DEPTH)


with BuildPart() as part_3:
    add(part_2.part)

    # Cut-Extrude21: cut by cut_extrude21_tool
    add(cut_extrude21_tool.part, mode=Mode.SUBTRACT)



with BuildPart() as body_2_3:
    add(body_2_2.part)

    # Cut-Extrude21: cut by cut_extrude21_tool
    add(cut_extrude21_tool.part, mode=Mode.SUBTRACT)


with BuildPart() as body_3_3:
    add(body_3_2.part)

    # Cut-Extrude21: cut by cut_extrude21_tool
    add(cut_extrude21_tool.part, mode=Mode.SUBTRACT)


with BuildPart() as body_4_3:
    add(body_4_2.part)

    # Cut-Extrude21: cut by cut_extrude21_tool
    add(cut_extrude21_tool.part, mode=Mode.SUBTRACT)


with BuildPart() as part_4:
    add(part_3.part)

    add(body_2_3.part)  # Boss-Extrude4 merges body 2

    add(body_3_3.part)  # Boss-Extrude4 merges body 3

    add(body_4_3.part)  # Boss-Extrude4 merges body 4
    # Sketch34 → Boss-Extrude4 (add)
    with BuildSketch(Plane.XZ.offset(-3)):
        with Locations((-1.1214e-05, -16.155299606)):
            Rectangle(SKETCH34_W, SKETCH34_H)
    extrude(amount=-BOSS_EXTRUDE4_DEPTH)


solid = part_4.part
